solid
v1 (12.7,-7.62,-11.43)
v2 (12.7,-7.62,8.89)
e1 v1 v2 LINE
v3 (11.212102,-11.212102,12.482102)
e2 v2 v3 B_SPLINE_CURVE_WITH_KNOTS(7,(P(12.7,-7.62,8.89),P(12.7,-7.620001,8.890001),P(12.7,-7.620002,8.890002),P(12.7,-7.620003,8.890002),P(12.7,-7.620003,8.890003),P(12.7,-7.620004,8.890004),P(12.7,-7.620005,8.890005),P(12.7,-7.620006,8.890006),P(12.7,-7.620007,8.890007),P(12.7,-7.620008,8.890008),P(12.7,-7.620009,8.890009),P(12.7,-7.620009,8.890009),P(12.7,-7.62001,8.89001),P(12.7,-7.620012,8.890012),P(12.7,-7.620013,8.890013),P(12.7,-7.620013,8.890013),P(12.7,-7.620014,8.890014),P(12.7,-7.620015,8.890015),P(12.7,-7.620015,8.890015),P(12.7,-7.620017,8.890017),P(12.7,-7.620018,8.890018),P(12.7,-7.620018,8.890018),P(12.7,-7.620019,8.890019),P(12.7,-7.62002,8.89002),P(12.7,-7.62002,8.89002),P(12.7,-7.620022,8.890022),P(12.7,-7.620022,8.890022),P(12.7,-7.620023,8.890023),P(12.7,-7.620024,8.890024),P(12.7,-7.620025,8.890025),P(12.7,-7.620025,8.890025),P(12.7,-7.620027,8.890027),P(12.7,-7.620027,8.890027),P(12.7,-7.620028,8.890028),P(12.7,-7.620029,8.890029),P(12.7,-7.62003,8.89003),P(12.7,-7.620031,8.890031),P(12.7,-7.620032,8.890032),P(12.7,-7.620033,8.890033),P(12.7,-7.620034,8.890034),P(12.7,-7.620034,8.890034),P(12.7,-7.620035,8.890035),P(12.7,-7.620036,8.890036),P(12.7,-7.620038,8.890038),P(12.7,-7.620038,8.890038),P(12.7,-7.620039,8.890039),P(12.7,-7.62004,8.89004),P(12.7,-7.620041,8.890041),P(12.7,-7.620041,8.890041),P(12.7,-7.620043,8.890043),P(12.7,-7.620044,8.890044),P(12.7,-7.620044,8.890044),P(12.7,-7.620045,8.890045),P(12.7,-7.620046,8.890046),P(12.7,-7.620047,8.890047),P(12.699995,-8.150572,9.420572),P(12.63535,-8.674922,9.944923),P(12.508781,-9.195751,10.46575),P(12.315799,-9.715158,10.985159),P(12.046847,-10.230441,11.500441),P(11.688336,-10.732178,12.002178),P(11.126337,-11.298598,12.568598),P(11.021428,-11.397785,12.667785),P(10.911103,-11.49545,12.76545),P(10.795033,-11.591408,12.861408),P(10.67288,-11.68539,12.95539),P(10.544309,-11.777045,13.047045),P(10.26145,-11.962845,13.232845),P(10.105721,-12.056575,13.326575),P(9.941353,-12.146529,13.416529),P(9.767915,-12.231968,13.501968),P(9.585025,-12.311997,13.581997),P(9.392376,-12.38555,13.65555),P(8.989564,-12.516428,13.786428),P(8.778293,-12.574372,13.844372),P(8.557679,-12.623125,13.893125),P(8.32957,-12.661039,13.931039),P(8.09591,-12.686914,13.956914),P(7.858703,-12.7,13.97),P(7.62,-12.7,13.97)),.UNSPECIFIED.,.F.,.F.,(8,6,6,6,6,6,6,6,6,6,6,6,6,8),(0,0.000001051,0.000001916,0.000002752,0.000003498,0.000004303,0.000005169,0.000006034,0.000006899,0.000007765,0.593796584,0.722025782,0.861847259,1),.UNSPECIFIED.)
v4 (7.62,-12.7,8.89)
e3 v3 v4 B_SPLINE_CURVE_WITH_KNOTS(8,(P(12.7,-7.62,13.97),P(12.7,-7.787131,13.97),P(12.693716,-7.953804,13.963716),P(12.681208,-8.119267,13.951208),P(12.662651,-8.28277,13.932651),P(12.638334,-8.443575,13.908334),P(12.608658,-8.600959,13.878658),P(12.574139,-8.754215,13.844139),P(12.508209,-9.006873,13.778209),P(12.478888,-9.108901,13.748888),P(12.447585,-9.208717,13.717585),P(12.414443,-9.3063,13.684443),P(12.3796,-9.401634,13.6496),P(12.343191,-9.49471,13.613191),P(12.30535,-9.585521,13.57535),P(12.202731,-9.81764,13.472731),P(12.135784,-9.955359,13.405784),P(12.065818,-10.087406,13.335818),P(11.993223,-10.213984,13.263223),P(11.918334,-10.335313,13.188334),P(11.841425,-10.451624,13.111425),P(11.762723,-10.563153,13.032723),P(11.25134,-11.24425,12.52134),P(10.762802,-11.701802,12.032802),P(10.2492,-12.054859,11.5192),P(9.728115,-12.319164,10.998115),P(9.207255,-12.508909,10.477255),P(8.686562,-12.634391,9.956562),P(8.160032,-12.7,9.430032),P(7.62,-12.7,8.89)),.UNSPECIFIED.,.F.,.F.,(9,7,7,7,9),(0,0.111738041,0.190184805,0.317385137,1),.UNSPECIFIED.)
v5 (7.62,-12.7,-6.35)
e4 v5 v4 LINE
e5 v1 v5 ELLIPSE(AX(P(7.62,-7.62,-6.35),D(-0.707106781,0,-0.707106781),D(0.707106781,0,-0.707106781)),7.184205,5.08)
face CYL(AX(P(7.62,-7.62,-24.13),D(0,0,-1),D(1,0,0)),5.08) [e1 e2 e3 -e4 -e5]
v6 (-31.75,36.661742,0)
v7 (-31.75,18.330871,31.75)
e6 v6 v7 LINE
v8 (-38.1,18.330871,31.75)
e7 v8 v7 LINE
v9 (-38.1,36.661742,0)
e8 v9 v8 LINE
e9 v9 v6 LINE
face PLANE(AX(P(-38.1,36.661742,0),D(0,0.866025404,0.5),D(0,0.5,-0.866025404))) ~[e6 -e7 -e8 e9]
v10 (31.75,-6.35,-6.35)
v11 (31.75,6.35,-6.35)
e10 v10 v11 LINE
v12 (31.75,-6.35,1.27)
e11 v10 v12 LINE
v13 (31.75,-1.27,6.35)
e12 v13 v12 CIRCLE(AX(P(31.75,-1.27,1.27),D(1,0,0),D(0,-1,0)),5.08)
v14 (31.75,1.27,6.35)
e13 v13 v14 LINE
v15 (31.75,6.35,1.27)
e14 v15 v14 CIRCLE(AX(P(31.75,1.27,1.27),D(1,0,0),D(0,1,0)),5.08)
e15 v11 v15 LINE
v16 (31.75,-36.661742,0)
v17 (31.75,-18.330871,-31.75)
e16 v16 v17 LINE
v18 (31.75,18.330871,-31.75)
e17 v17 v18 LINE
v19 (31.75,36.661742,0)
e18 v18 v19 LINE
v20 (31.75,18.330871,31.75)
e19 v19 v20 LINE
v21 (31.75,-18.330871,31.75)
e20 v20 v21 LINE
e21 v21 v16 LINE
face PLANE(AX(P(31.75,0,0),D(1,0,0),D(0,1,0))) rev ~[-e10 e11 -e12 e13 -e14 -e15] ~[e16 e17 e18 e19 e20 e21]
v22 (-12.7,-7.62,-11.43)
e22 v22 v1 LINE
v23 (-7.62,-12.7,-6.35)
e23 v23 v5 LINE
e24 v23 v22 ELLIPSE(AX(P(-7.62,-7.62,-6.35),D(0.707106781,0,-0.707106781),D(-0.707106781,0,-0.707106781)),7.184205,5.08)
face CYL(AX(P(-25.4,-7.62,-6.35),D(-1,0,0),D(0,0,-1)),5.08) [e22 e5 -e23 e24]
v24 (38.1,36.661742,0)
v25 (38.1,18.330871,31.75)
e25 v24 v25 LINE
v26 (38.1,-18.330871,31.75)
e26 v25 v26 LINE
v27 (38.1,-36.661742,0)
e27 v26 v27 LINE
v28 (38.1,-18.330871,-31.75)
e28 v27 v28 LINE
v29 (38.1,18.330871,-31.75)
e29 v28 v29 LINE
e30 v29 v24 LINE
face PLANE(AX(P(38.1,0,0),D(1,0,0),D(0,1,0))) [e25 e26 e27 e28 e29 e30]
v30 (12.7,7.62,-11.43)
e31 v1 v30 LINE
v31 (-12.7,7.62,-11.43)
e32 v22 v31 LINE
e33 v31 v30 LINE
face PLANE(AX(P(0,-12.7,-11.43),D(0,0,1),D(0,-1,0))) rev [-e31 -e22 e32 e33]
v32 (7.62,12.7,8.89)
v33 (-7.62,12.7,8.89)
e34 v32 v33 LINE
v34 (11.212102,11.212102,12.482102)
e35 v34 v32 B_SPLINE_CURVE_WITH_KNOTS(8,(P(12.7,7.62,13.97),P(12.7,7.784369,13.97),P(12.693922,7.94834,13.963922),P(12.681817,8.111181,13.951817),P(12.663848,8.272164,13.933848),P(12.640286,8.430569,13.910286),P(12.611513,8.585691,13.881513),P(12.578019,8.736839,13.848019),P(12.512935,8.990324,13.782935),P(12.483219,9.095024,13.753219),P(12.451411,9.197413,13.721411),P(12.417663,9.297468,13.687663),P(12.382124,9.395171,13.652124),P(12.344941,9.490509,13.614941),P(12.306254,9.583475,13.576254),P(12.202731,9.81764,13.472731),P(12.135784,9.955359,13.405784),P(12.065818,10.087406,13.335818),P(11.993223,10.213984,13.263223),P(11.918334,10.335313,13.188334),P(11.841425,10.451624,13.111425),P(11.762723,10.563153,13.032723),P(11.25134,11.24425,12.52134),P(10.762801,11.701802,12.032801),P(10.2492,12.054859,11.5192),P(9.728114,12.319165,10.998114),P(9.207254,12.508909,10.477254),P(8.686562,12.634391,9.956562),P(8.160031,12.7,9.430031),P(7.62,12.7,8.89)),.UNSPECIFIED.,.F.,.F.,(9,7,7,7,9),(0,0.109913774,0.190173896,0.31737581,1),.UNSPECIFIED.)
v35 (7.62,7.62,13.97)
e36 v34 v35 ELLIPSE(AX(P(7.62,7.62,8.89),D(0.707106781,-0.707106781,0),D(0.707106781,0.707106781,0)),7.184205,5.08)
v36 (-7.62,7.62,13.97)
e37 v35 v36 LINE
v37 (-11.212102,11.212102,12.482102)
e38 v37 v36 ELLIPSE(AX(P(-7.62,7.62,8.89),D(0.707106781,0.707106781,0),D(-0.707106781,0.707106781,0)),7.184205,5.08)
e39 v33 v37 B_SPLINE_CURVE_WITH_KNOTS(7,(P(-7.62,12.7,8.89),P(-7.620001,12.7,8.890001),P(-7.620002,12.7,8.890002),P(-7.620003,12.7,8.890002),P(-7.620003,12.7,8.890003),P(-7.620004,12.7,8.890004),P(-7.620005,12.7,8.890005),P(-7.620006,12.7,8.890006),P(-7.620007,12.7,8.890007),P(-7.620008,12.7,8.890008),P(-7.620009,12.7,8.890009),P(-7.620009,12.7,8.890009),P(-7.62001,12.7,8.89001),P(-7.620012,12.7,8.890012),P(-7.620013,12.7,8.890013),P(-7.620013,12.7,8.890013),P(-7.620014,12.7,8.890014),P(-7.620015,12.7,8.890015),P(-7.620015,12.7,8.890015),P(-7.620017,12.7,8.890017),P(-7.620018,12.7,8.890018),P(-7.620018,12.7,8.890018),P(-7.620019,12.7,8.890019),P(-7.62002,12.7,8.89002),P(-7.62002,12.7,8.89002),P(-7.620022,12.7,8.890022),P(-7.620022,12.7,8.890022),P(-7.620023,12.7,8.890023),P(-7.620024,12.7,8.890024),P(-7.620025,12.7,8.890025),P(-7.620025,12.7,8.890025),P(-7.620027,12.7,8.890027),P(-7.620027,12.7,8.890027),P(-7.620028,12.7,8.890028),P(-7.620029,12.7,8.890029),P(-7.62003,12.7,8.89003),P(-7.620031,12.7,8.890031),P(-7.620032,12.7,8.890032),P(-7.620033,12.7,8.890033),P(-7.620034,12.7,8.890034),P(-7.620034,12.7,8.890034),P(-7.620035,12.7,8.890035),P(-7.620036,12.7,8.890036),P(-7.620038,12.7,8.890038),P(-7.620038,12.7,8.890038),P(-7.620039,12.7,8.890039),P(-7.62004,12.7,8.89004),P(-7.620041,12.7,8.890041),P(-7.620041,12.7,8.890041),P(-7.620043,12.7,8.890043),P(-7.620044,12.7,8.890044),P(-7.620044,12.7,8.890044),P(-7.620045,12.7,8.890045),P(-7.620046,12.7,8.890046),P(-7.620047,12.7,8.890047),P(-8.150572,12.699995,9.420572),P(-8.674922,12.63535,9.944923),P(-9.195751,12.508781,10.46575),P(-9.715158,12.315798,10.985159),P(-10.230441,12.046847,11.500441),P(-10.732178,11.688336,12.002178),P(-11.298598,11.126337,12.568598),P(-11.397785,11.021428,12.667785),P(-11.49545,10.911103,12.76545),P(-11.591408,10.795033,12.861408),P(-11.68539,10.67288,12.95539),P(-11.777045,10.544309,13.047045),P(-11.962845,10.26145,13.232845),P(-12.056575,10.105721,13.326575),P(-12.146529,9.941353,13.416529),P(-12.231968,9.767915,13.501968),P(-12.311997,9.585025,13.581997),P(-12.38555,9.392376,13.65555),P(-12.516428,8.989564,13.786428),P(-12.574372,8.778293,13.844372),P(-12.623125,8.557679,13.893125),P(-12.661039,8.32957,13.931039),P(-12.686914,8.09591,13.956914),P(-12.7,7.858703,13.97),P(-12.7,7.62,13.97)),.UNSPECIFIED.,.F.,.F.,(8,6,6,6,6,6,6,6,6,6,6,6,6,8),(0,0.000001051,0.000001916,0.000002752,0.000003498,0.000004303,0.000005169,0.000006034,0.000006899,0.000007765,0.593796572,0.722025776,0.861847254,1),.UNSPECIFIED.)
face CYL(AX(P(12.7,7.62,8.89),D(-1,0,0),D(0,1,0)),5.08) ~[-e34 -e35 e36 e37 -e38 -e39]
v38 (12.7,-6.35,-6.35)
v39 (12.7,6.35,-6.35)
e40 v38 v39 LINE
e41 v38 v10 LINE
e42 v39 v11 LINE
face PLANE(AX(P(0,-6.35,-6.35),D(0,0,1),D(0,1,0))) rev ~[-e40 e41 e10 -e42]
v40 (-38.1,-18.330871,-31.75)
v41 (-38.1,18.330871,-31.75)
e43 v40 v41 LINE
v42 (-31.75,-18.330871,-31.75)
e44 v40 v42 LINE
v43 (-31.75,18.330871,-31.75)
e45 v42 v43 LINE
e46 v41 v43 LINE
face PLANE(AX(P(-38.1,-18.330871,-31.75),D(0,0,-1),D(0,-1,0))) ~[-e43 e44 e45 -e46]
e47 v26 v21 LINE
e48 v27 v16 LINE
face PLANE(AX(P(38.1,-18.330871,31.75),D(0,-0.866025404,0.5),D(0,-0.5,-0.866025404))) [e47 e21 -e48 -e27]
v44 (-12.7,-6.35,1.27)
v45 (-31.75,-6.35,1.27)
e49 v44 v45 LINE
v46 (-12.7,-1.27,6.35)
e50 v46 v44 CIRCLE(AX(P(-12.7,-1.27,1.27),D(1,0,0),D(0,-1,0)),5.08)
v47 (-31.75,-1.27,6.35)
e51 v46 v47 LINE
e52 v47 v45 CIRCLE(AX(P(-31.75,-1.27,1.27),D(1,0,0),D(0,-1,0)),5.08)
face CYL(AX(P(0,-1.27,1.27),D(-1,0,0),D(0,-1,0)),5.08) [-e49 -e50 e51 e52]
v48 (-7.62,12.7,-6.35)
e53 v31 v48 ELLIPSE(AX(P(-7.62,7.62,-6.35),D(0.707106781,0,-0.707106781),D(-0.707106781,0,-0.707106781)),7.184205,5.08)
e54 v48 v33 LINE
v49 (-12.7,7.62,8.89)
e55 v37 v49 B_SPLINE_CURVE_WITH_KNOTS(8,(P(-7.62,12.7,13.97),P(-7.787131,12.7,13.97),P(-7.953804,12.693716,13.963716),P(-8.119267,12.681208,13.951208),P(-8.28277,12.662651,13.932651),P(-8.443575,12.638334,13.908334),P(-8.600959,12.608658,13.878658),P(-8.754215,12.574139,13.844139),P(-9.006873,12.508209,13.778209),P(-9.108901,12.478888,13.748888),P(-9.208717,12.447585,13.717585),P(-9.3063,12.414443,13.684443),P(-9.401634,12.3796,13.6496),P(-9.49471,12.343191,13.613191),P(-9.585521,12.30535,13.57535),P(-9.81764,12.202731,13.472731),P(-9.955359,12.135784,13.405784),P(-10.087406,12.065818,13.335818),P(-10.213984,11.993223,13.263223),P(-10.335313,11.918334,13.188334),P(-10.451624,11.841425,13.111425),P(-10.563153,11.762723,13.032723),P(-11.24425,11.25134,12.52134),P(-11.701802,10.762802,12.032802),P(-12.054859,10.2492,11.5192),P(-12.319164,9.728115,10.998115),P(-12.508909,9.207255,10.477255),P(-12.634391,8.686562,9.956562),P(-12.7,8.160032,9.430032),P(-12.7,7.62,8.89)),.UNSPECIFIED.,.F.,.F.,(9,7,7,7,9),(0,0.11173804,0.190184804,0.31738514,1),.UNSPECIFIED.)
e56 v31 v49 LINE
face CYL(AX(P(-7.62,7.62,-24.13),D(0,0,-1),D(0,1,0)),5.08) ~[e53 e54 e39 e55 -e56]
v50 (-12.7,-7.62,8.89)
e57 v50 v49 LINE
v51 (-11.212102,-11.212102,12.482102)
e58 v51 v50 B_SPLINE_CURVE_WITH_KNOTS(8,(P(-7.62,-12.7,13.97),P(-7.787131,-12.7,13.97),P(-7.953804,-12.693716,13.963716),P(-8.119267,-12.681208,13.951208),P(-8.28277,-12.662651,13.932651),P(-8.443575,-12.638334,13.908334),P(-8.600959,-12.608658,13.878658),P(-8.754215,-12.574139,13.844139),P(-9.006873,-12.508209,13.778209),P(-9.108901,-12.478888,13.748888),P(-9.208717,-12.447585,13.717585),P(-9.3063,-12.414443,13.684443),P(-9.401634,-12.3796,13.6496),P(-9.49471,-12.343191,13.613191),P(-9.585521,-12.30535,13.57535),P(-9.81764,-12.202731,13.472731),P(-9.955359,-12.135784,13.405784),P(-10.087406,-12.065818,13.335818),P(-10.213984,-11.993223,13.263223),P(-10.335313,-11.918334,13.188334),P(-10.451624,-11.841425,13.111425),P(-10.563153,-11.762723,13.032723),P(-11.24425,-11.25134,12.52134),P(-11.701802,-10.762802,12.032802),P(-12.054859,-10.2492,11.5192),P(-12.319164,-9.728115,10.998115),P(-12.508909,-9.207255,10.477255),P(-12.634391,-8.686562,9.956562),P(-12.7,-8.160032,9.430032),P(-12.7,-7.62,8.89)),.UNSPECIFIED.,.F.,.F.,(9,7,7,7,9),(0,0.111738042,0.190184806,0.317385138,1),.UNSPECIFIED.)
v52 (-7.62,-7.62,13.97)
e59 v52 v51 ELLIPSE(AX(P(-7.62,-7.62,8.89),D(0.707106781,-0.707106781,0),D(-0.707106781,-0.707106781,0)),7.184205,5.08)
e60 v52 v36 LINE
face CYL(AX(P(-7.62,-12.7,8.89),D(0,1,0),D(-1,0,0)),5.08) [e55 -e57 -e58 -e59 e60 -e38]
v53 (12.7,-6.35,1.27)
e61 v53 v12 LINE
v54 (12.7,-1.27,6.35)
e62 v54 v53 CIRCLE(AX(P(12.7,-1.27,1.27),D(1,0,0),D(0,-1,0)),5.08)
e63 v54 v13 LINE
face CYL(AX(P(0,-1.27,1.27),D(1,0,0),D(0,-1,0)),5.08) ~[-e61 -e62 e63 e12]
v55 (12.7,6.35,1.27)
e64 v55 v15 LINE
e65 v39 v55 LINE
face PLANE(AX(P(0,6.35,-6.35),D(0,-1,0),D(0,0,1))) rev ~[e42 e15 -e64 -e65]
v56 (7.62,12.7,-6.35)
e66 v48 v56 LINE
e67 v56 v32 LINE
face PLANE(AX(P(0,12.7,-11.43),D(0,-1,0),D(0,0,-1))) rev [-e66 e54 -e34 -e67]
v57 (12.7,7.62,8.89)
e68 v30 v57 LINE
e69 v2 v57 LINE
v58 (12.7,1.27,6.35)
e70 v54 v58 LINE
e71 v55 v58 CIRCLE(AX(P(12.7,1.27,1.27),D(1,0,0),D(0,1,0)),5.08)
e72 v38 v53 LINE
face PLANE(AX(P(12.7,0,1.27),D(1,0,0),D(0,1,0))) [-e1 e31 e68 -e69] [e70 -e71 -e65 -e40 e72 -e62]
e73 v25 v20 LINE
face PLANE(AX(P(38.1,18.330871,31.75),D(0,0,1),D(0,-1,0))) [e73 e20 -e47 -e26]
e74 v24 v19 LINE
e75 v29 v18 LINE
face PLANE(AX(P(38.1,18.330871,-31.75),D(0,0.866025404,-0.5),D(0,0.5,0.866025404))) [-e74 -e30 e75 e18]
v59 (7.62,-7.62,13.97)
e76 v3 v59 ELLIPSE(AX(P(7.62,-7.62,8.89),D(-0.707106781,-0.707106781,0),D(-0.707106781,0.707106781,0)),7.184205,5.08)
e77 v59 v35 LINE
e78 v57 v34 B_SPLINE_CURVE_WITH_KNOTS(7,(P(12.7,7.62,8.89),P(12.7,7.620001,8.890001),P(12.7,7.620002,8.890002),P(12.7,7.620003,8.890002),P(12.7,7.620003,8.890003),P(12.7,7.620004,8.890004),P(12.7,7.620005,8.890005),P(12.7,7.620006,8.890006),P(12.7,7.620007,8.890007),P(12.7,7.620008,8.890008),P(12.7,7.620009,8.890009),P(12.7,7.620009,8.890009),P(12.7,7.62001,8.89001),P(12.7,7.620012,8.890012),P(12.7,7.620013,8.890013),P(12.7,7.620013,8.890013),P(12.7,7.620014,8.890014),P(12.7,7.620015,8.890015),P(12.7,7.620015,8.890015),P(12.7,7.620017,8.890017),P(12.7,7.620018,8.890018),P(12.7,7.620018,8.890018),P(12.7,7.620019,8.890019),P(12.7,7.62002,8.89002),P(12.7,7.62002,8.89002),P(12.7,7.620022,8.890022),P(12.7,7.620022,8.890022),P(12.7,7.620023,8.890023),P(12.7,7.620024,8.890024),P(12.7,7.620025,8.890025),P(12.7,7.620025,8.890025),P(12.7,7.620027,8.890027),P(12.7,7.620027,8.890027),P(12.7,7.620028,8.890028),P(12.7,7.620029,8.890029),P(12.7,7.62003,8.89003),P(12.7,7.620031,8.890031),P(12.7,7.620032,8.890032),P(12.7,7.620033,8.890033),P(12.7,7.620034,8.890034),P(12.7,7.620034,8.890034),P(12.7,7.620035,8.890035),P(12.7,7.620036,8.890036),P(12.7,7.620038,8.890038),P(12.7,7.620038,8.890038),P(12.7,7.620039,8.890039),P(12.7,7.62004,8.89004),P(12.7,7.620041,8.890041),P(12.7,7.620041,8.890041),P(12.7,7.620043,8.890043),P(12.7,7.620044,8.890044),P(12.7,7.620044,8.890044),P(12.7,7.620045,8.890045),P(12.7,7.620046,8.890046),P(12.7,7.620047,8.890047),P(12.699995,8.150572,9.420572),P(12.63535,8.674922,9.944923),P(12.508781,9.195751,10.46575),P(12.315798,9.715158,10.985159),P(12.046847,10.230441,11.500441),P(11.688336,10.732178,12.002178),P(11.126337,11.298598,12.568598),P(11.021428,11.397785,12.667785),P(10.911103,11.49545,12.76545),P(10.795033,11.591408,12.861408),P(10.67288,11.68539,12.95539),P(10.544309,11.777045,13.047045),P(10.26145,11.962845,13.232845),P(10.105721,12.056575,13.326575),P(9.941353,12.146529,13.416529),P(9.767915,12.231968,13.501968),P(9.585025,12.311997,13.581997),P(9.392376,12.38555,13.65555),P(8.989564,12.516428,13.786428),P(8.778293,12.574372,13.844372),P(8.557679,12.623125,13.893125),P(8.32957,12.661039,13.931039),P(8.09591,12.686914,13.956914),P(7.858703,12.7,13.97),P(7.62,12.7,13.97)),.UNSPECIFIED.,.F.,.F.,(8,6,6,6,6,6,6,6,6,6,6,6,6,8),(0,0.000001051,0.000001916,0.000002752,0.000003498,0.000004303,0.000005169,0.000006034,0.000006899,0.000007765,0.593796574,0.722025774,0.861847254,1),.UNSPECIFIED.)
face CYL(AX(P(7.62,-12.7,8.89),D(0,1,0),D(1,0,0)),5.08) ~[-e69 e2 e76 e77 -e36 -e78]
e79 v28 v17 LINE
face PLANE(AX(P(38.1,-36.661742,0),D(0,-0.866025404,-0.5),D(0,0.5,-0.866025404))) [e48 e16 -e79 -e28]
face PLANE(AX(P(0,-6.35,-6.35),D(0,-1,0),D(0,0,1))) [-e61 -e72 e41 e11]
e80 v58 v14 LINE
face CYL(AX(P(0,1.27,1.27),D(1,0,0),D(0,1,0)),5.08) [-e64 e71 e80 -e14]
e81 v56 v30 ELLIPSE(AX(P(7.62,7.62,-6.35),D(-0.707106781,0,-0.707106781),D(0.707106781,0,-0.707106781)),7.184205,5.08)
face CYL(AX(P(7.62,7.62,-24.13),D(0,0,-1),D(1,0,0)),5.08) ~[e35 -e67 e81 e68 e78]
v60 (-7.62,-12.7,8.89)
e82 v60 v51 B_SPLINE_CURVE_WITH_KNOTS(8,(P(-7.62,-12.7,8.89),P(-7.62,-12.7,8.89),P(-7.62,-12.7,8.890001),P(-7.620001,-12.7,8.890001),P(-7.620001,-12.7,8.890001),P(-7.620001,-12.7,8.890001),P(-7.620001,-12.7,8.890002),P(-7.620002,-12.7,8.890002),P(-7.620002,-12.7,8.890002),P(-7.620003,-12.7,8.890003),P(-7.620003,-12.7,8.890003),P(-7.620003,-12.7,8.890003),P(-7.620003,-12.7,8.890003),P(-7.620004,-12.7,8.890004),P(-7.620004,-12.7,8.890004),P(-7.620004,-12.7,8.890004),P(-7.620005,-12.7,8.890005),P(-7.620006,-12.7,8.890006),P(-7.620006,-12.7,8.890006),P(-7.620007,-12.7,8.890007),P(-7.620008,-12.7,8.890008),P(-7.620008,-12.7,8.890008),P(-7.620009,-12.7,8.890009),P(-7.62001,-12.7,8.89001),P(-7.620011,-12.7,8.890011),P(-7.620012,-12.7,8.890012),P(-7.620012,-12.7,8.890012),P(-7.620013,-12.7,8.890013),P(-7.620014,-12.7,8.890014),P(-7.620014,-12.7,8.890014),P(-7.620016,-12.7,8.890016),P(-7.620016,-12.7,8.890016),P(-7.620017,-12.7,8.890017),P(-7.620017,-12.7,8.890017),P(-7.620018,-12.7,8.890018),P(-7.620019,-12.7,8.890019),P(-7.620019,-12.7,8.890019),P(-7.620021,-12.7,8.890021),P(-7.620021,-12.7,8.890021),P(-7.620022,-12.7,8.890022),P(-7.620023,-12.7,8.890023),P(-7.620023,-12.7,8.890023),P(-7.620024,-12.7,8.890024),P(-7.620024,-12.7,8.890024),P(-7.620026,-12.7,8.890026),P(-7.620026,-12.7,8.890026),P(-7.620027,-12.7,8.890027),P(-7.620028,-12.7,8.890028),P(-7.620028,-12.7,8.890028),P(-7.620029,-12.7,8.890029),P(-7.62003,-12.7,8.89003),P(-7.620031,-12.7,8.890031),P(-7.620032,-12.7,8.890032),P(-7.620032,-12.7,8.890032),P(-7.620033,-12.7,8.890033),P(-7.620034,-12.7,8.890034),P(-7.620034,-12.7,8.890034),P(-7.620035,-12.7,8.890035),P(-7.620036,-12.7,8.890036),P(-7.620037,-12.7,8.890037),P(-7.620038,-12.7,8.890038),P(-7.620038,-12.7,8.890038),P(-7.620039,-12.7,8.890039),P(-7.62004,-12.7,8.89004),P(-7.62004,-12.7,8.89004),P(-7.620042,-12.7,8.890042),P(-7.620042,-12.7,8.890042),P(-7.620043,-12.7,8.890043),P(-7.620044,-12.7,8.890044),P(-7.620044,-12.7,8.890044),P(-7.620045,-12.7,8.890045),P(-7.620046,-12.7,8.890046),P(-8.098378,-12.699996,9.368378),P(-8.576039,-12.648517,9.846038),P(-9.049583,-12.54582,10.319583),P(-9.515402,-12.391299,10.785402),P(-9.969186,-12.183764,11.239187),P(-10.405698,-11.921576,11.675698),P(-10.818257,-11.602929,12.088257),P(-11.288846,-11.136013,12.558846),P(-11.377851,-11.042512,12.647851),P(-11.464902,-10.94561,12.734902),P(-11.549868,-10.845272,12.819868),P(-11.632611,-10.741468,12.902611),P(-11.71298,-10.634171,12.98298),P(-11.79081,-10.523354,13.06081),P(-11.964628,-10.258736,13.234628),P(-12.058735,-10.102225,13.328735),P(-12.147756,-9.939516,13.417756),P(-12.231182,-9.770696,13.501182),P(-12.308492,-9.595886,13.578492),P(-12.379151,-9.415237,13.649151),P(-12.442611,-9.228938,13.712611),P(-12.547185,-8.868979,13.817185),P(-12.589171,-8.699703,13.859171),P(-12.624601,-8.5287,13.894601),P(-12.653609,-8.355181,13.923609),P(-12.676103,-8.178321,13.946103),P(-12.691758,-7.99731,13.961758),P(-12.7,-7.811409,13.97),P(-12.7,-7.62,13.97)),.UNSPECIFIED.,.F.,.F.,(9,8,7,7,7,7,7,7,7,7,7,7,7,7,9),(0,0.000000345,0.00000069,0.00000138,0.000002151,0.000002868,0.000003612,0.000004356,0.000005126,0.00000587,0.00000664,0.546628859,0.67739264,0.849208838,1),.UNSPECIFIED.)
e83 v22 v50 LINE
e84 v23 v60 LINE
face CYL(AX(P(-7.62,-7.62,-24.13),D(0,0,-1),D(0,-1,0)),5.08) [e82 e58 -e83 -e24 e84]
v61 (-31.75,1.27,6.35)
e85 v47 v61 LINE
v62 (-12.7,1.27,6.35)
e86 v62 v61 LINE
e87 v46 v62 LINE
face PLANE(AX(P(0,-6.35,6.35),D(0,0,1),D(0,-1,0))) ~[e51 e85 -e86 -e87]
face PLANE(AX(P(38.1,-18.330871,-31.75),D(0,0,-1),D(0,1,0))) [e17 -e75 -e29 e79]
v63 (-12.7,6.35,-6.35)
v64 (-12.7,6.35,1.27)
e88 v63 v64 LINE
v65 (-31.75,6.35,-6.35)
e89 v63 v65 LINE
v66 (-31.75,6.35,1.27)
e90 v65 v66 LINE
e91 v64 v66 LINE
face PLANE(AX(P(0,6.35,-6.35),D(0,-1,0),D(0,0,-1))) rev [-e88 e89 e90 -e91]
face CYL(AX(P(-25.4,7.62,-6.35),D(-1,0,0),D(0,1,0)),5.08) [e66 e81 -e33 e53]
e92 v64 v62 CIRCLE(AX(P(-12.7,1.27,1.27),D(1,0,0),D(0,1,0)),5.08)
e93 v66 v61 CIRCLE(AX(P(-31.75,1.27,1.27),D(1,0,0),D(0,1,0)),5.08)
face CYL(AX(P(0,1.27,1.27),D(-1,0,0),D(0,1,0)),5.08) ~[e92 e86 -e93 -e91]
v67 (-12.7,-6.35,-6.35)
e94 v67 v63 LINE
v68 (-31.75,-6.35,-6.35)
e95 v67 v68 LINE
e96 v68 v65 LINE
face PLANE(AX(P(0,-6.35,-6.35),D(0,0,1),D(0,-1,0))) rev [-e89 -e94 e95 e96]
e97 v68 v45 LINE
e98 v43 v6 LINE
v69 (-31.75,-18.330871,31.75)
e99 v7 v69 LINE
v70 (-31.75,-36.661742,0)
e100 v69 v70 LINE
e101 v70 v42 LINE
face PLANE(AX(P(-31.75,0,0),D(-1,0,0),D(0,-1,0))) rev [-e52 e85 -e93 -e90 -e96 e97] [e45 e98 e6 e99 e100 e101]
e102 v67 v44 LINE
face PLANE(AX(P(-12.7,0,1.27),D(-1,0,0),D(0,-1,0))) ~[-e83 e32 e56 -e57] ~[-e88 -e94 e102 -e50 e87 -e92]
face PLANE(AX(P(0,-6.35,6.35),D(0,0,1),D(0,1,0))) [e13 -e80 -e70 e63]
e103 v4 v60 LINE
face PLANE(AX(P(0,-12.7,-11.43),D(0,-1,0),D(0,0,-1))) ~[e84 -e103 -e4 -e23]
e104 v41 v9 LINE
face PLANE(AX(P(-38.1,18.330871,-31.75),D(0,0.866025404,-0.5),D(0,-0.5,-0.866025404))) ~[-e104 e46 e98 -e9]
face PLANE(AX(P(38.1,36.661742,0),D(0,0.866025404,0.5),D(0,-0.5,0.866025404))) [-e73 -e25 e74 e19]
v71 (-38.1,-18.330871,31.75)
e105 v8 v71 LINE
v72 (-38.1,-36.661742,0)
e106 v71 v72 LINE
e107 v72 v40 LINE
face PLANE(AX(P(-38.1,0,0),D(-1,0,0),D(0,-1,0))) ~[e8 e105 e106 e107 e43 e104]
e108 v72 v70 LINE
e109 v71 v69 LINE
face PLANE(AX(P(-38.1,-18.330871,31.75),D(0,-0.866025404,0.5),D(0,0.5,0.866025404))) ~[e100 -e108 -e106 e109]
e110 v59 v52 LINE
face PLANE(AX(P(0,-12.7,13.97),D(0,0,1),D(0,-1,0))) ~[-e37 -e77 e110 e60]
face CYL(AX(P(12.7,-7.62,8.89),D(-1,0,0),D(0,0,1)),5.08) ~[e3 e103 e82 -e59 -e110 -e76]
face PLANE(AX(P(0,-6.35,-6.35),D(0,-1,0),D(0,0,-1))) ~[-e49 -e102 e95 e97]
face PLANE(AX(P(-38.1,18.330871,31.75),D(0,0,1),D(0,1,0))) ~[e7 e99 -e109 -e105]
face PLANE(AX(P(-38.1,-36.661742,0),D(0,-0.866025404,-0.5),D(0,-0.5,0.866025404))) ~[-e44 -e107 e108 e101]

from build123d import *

# Parameters (mm, degrees)
F0_W         = 12.7
F0_H         = 12.7
F1_DEPTH     = 38.1
F2_R         = 5.08
F3_W         = 25.4
F3_H         = 25.4
F4_DEPTH     = 12.7
F6_DEPTH     = 6.35
F8_R         = 5.08
F9_T1_DEPTH  = 45.72
F9_T3_DEPTH  = 50.8
F10_T1_DEPTH = 45.72
F10_T3_DEPTH = 50.8


# Not quite as in the source:
# - a fillet or chamfer that OpenCascade refuses, or shapes differently, is made with other operations: its cross-section is extruded or revolved along the edge and cut away or added


with BuildPart() as f1:
    # F0 (on Right) → F1 (new body)
    with BuildSketch(Plane.YZ):
        Rectangle(F0_W, F0_H)
    extrude(amount=F1_DEPTH)

    # F2
    f2_edges = [f1.edges().sort_by_distance(p)[0] for p in [
        (19.05, 6.35, 6.35),
        (19.05, -6.35, 6.35),
        (0, 0, 6.35),
    ]]
    fillet(f2_edges, radius=F2_R)

    # F3 (on Right) → F4 (join)
    with BuildSketch(Plane.YZ):
        with Locations((0, 1.27)):
            Rectangle(F3_W, F3_H)
    extrude(amount=F4_DEPTH)

    # F5 (on face) → F6 (join)
    with BuildSketch(Plane.YZ.offset(38.1)):
        Polygon((-18.3308710468, -31.75), (18.3308710468, -31.75), (36.6617420935, 0), (18.3308710468, 31.75), (-18.3308710468, 31.75), (-36.6617420935, 0), align=None)
    extrude(amount=-F6_DEPTH)

    # F7: F1 across plane


with BuildPart() as f1_1:
    add(f1.part)
    add(f1.part.mirror(Plane.YZ))

    # F8
    f8_edges = [f1_1.edges().sort_by_distance(p)[0] for p in [
        (12.7, 0, 13.97),
        (0, -12.7, 13.97),
        (-12.7, 0, 13.97),
        (0, 12.7, 13.97),
    ]]
    fillet(f8_edges, radius=F8_R)

    # F9: fillet of radius 5.08 on 4 edges, made by hand

    # F9_s2 → F9_t1 (cut)
    with BuildSketch(Plane.XY.offset(-24.13)):
        with BuildLine():
            ThreePointArc((12.7, -7.62), (11.2121024484, -11.2121024484), (7.62, -12.7))
            Line((7.62, -12.7), (12.7, -12.7))
            Line((12.7, -12.7), (12.7, -7.62))
        make_face()
        with BuildLine():
            ThreePointArc((-7.62, -12.7), (-11.2121024484, -11.2121024484), (-12.7, -7.62))
            Line((-12.7, -7.62), (-12.7, -12.7))
            Line((-12.7, -12.7), (-7.62, -12.7))
        make_face()
    extrude(amount=F9_T1_DEPTH, mode=Mode.SUBTRACT)

    # F9_s4 → F9_t3 (cut)
    with BuildSketch(Plane.YZ.offset(-25.4)):
        with BuildLine():
            ThreePointArc((-7.62, -11.43), (-11.2121024484, -9.9421024484), (-12.7, -6.35))
            Line((-12.7, -6.35), (-12.7, -11.43))
            Line((-12.7, -11.43), (-7.62, -11.43))
        make_face()
    extrude(amount=F9_T3_DEPTH, mode=Mode.SUBTRACT)

    # F10: fillet of radius 5.08 on 4 edges, made by hand

    # F10_s2 → F10_t1 (cut)
    with BuildSketch(Plane.XY.offset(-24.13)):
        with BuildLine():
            ThreePointArc((12.7, 7.62), (11.2121024484, 11.2121024484), (7.62, 12.7))
            Line((7.62, 12.7), (12.7, 12.7))
            Line((12.7, 12.7), (12.7, 7.62))
        make_face()
        with BuildLine():
            ThreePointArc((-7.62, 12.7), (-11.2121024484, 11.2121024484), (-12.7, 7.62))
            Line((-12.7, 7.62), (-12.7, 12.7))
            Line((-12.7, 12.7), (-7.62, 12.7))
        make_face()
    extrude(amount=F10_T1_DEPTH, mode=Mode.SUBTRACT)

    # F10_s4 → F10_t3 (cut)
    with BuildSketch(Plane.YZ.offset(-25.4)):
        with BuildLine():
            ThreePointArc((12.7, -6.35), (11.2121024484, -9.9421024484), (7.62, -11.43))
            Line((7.62, -11.43), (12.7, -11.43))
            Line((12.7, -11.43), (12.7, -6.35))
        make_face()
    extrude(amount=F10_T3_DEPTH, mode=Mode.SUBTRACT)


solid = f1_1.part
